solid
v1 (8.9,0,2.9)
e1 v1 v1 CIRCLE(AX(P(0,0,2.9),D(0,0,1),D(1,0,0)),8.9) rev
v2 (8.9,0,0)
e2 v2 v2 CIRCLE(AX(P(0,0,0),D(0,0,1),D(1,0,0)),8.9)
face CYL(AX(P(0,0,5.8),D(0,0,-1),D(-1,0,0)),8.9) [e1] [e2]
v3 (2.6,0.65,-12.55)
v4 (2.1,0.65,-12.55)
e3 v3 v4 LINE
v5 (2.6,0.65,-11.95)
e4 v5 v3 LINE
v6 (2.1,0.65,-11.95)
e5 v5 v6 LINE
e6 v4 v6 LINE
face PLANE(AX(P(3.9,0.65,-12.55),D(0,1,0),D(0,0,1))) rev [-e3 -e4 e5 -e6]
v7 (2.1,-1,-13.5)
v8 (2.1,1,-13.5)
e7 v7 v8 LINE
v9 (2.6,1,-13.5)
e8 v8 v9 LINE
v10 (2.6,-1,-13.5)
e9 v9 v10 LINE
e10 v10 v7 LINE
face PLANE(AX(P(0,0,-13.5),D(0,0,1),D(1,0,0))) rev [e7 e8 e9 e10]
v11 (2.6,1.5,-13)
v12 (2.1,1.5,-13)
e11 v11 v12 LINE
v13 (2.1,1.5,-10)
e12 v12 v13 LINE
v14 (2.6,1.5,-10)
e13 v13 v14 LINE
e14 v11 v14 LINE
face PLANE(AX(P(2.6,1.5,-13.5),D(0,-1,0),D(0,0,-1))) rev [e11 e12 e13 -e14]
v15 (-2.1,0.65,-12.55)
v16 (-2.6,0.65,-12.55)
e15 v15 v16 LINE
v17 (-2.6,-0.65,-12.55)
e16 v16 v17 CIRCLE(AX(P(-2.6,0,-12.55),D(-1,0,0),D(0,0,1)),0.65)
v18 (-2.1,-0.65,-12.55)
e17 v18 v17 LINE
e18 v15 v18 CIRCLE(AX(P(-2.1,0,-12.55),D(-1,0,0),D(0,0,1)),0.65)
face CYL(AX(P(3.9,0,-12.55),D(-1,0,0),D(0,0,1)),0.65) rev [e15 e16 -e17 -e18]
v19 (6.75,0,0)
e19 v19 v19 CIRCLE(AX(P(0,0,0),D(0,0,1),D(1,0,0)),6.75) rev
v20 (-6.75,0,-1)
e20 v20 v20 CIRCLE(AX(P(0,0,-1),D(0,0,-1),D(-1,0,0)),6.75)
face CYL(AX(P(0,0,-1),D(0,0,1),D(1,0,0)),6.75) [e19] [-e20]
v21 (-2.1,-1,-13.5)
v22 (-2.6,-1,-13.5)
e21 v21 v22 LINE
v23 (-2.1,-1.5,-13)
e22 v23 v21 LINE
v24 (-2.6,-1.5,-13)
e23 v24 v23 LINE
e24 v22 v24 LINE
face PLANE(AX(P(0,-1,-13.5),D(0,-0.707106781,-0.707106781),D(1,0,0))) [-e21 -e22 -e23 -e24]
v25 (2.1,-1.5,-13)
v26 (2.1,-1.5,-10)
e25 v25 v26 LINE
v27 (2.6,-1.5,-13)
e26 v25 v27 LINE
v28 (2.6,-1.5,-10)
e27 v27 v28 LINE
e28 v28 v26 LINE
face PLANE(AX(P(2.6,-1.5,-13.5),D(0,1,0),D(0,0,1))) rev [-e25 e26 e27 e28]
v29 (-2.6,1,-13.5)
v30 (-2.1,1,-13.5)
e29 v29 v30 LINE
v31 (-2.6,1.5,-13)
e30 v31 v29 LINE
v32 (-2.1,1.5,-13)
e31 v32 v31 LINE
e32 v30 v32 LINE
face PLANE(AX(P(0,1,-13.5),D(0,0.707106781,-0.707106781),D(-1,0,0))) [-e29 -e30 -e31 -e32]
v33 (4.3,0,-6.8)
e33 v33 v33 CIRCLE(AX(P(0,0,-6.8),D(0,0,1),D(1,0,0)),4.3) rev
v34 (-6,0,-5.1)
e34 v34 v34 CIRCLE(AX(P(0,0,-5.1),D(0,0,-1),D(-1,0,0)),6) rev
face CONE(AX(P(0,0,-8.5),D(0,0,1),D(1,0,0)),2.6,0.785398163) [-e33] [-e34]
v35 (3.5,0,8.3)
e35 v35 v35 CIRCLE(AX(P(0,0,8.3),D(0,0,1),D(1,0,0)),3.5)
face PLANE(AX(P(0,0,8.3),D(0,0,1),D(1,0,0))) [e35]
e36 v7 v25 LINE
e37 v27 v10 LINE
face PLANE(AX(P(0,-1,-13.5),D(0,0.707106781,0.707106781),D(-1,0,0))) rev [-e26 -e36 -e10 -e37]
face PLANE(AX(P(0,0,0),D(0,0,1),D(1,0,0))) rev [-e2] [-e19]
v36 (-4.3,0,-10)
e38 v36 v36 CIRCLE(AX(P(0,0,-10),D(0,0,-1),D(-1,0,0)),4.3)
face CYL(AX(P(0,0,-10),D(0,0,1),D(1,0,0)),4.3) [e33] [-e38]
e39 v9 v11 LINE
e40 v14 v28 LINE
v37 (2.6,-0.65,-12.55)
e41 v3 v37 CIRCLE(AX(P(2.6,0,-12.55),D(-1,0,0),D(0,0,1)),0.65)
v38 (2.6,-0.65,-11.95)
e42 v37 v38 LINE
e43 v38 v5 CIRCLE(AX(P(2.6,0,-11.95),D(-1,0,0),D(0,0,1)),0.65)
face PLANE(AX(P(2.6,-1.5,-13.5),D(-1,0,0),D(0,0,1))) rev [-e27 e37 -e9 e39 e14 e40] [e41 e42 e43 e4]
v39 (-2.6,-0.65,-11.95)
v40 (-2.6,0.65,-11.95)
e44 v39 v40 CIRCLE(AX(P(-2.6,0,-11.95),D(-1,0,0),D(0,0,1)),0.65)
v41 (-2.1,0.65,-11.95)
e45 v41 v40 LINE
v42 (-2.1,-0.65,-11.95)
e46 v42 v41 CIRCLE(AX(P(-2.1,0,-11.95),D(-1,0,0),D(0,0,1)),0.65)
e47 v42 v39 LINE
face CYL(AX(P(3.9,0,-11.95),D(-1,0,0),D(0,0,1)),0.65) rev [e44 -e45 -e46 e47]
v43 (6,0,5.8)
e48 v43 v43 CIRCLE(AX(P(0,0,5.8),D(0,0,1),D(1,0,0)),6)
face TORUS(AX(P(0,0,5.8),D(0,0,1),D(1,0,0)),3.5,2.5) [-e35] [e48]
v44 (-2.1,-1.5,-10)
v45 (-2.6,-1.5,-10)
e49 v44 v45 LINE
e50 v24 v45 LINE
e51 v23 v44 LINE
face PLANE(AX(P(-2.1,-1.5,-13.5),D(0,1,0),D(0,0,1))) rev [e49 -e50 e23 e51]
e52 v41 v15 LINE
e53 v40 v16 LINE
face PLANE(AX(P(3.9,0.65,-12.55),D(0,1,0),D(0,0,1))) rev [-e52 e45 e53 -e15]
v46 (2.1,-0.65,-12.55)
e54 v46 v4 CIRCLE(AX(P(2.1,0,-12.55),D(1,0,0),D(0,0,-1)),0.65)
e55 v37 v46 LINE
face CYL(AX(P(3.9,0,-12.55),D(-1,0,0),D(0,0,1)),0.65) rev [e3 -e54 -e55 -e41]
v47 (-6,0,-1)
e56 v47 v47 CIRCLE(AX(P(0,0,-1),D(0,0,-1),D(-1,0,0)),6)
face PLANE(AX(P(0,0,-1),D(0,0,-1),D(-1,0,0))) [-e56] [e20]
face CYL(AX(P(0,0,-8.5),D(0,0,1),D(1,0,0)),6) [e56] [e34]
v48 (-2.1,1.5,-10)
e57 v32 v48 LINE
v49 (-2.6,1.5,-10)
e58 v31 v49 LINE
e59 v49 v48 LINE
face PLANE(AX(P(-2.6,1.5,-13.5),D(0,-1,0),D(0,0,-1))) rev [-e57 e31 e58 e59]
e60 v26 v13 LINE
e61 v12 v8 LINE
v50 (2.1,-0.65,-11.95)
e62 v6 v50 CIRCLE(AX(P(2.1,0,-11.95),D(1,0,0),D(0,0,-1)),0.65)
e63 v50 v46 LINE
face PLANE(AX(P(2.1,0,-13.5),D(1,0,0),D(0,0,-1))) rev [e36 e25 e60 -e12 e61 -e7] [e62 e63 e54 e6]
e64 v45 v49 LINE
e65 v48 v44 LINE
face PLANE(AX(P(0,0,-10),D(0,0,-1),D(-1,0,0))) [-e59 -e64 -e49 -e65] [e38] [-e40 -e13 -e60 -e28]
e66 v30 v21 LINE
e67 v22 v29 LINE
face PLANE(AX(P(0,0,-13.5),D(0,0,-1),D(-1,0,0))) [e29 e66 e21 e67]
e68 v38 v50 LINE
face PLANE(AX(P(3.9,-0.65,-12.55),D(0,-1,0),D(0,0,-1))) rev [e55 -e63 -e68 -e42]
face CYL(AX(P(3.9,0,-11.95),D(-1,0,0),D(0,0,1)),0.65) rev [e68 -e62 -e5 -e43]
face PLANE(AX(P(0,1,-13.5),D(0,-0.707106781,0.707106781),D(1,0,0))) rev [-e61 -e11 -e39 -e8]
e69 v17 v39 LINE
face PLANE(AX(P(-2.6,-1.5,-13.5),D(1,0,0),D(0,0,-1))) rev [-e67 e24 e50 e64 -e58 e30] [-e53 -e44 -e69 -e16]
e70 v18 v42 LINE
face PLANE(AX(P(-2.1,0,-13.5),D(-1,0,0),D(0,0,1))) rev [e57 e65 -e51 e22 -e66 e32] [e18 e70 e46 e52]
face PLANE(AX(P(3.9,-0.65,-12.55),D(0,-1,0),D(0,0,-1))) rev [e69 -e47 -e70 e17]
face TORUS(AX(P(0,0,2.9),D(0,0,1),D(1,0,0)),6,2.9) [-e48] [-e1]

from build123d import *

# Parameters (mm, degrees)
SKETCH_1_R          = 8.9
EXTRUDE_1_DEPTH     = 5.8
FILLET_2_R          = 2.9
SKETCH_2_R          = 6.75
EXTRUDE_2_DEPTH     = 1
SKETCH_3_R          = 6
EXTRUDE_3_DEPTH     = 7.5
SKETCH_4_R          = 4.3
EXTRUDE_4_DEPTH     = 1.5
CHAMFER_1_SIZE      = 3.4
EXTRUDE_5_DEPTH     = 3.5
CUT_EXTRUDE_1_DEPTH = 6.5
CHAMFER_2_SIZE      = 0.5
EXTRUDE_START       = 2.5
SKETCH_7_R          = 6
EXTRUDE_6_DEPTH     = 2.5
FILLET_3_R          = 2.5


# Some blends are built 0.0001 mm under size
with BuildPart() as part:
    # 草图1 → 凸台-拉伸1 (new body)
    with BuildSketch(Plane.XY):
        Circle(SKETCH_1_R)
    extrude(amount=EXTRUDE_1_DEPTH)

    # 圆角2
    fillet_2_edges = [part.edges().sort_by_distance(p)[0] for p in [
        (-8.9, 0, 5.8),
    ]]
    fillet(fillet_2_edges, radius=FILLET_2_R)

    # 草图2 → 凸台-拉伸2 (add)
    with BuildSketch(Plane(origin=(0, 0, 0), x_dir=(-1, 0, 0), z_dir=(0, 0, -1))):
        with Locations(Location((0, 0, 0), (0, 0, 180))):
            Circle(SKETCH_2_R)
    extrude(amount=EXTRUDE_2_DEPTH)

    # 草图3 → 凸台-拉伸3 (add)
    with BuildSketch(Plane(origin=(0, 0, -1), x_dir=(-1, 0, 0), z_dir=(0, 0, -1))):
        Circle(SKETCH_3_R)
    extrude(amount=EXTRUDE_3_DEPTH)

    # 草图4 → 凸台-拉伸4 (add)
    with BuildSketch(Plane(origin=(0, 0, -8.5), x_dir=(-1, 0, 0), z_dir=(0, 0, -1))):
        Circle(SKETCH_4_R)
    extrude(amount=EXTRUDE_4_DEPTH)

    # 倒角1
    # the kernel refuses this chamfer: 3.4 mm, written as the material it takes off along each edge
    with BuildSketch(Plane(origin=(0, 0, -8.5), x_dir=(-1, 0, 0), z_dir=(0, -1, 0))) as chamfer_1_piece_1_section:
        Polygon((6, -CHAMFER_1_SIZE), (6 - CHAMFER_1_SIZE, 0), (6, 0), align=None)
    chamfer_1_piece_1 = revolve(axis=Axis((0, 0, -8.5), (0, 0, -1)), mode=Mode.PRIVATE)
    chamfer_1_piece_1 = chamfer_1_piece_1 - Plane(origin=(0, 0, -5.94008013), x_dir=(-1, 0, 0), z_dir=(0, 0, 1)) * Cylinder(4.3, 24, mode=Mode.PRIVATE)
    add(chamfer_1_piece_1, mode=Mode.SUBTRACT)

    # 草图5 → 凸台-拉伸5 (add)
    with BuildSketch(Plane(origin=(0, 0, -10), x_dir=(-1, 0, 0), z_dir=(0, 0, -1))):
        Polygon((-2.6, 1.5), (-2.1, 1.5), (-2.1, 0), (-2.1, -1.5), (-2.6, -1.5), align=None)
        Polygon((2.1, 0), (2.1, 1.5), (2.6, 1.5), (2.6, -1.5), (2.1, -1.5), align=None)
    extrude(amount=EXTRUDE_5_DEPTH)

    # 草图6 → 切除-拉伸1 (cut)
    with BuildSketch(Plane.ZY.offset(2.6)):
        with BuildLine():
            Line((-12.55, 0.65), (-11.95, 0.65))
            ThreePointArc((-11.95, 0.65), (-11.3, 0), (-11.95, -0.65))
            Line((-11.95, -0.65), (-12.55, -0.65))
            ThreePointArc((-12.55, -0.65), (-13.2, 0), (-12.55, 0.65))
        make_face()
    extrude(amount=-CUT_EXTRUDE_1_DEPTH, mode=Mode.SUBTRACT)

    # 倒角2
    chamfer_2_edges = [part.edges().sort_by_distance(p)[0] for p in [
        (-2.35, -1.5, -13.5),
        (-2.35, 1.5, -13.5),
        (2.35, -1.5, -13.5),
        (2.35, 1.5, -13.5),
    ]]
    chamfer(chamfer_2_edges, length=CHAMFER_2_SIZE)

    # 草图7 → 凸台-拉伸6 (add)
    with BuildSketch(Plane.XY.offset(5.8).offset(EXTRUDE_START)):
        with Locations(Location((0, 0, 0), (0, 0, 180))):
            Circle(SKETCH_7_R)
    extrude(amount=-EXTRUDE_6_DEPTH)

    # 圆角3
    fillet_3_edges = [part.edges().sort_by_distance(p)[0] for p in [
        (6, 0, 8.3),
    ]]
    fillet(fillet_3_edges, radius=FILLET_3_R - 0.0001)  # a hair under: the kernel refuses the full size


solid = part.part
